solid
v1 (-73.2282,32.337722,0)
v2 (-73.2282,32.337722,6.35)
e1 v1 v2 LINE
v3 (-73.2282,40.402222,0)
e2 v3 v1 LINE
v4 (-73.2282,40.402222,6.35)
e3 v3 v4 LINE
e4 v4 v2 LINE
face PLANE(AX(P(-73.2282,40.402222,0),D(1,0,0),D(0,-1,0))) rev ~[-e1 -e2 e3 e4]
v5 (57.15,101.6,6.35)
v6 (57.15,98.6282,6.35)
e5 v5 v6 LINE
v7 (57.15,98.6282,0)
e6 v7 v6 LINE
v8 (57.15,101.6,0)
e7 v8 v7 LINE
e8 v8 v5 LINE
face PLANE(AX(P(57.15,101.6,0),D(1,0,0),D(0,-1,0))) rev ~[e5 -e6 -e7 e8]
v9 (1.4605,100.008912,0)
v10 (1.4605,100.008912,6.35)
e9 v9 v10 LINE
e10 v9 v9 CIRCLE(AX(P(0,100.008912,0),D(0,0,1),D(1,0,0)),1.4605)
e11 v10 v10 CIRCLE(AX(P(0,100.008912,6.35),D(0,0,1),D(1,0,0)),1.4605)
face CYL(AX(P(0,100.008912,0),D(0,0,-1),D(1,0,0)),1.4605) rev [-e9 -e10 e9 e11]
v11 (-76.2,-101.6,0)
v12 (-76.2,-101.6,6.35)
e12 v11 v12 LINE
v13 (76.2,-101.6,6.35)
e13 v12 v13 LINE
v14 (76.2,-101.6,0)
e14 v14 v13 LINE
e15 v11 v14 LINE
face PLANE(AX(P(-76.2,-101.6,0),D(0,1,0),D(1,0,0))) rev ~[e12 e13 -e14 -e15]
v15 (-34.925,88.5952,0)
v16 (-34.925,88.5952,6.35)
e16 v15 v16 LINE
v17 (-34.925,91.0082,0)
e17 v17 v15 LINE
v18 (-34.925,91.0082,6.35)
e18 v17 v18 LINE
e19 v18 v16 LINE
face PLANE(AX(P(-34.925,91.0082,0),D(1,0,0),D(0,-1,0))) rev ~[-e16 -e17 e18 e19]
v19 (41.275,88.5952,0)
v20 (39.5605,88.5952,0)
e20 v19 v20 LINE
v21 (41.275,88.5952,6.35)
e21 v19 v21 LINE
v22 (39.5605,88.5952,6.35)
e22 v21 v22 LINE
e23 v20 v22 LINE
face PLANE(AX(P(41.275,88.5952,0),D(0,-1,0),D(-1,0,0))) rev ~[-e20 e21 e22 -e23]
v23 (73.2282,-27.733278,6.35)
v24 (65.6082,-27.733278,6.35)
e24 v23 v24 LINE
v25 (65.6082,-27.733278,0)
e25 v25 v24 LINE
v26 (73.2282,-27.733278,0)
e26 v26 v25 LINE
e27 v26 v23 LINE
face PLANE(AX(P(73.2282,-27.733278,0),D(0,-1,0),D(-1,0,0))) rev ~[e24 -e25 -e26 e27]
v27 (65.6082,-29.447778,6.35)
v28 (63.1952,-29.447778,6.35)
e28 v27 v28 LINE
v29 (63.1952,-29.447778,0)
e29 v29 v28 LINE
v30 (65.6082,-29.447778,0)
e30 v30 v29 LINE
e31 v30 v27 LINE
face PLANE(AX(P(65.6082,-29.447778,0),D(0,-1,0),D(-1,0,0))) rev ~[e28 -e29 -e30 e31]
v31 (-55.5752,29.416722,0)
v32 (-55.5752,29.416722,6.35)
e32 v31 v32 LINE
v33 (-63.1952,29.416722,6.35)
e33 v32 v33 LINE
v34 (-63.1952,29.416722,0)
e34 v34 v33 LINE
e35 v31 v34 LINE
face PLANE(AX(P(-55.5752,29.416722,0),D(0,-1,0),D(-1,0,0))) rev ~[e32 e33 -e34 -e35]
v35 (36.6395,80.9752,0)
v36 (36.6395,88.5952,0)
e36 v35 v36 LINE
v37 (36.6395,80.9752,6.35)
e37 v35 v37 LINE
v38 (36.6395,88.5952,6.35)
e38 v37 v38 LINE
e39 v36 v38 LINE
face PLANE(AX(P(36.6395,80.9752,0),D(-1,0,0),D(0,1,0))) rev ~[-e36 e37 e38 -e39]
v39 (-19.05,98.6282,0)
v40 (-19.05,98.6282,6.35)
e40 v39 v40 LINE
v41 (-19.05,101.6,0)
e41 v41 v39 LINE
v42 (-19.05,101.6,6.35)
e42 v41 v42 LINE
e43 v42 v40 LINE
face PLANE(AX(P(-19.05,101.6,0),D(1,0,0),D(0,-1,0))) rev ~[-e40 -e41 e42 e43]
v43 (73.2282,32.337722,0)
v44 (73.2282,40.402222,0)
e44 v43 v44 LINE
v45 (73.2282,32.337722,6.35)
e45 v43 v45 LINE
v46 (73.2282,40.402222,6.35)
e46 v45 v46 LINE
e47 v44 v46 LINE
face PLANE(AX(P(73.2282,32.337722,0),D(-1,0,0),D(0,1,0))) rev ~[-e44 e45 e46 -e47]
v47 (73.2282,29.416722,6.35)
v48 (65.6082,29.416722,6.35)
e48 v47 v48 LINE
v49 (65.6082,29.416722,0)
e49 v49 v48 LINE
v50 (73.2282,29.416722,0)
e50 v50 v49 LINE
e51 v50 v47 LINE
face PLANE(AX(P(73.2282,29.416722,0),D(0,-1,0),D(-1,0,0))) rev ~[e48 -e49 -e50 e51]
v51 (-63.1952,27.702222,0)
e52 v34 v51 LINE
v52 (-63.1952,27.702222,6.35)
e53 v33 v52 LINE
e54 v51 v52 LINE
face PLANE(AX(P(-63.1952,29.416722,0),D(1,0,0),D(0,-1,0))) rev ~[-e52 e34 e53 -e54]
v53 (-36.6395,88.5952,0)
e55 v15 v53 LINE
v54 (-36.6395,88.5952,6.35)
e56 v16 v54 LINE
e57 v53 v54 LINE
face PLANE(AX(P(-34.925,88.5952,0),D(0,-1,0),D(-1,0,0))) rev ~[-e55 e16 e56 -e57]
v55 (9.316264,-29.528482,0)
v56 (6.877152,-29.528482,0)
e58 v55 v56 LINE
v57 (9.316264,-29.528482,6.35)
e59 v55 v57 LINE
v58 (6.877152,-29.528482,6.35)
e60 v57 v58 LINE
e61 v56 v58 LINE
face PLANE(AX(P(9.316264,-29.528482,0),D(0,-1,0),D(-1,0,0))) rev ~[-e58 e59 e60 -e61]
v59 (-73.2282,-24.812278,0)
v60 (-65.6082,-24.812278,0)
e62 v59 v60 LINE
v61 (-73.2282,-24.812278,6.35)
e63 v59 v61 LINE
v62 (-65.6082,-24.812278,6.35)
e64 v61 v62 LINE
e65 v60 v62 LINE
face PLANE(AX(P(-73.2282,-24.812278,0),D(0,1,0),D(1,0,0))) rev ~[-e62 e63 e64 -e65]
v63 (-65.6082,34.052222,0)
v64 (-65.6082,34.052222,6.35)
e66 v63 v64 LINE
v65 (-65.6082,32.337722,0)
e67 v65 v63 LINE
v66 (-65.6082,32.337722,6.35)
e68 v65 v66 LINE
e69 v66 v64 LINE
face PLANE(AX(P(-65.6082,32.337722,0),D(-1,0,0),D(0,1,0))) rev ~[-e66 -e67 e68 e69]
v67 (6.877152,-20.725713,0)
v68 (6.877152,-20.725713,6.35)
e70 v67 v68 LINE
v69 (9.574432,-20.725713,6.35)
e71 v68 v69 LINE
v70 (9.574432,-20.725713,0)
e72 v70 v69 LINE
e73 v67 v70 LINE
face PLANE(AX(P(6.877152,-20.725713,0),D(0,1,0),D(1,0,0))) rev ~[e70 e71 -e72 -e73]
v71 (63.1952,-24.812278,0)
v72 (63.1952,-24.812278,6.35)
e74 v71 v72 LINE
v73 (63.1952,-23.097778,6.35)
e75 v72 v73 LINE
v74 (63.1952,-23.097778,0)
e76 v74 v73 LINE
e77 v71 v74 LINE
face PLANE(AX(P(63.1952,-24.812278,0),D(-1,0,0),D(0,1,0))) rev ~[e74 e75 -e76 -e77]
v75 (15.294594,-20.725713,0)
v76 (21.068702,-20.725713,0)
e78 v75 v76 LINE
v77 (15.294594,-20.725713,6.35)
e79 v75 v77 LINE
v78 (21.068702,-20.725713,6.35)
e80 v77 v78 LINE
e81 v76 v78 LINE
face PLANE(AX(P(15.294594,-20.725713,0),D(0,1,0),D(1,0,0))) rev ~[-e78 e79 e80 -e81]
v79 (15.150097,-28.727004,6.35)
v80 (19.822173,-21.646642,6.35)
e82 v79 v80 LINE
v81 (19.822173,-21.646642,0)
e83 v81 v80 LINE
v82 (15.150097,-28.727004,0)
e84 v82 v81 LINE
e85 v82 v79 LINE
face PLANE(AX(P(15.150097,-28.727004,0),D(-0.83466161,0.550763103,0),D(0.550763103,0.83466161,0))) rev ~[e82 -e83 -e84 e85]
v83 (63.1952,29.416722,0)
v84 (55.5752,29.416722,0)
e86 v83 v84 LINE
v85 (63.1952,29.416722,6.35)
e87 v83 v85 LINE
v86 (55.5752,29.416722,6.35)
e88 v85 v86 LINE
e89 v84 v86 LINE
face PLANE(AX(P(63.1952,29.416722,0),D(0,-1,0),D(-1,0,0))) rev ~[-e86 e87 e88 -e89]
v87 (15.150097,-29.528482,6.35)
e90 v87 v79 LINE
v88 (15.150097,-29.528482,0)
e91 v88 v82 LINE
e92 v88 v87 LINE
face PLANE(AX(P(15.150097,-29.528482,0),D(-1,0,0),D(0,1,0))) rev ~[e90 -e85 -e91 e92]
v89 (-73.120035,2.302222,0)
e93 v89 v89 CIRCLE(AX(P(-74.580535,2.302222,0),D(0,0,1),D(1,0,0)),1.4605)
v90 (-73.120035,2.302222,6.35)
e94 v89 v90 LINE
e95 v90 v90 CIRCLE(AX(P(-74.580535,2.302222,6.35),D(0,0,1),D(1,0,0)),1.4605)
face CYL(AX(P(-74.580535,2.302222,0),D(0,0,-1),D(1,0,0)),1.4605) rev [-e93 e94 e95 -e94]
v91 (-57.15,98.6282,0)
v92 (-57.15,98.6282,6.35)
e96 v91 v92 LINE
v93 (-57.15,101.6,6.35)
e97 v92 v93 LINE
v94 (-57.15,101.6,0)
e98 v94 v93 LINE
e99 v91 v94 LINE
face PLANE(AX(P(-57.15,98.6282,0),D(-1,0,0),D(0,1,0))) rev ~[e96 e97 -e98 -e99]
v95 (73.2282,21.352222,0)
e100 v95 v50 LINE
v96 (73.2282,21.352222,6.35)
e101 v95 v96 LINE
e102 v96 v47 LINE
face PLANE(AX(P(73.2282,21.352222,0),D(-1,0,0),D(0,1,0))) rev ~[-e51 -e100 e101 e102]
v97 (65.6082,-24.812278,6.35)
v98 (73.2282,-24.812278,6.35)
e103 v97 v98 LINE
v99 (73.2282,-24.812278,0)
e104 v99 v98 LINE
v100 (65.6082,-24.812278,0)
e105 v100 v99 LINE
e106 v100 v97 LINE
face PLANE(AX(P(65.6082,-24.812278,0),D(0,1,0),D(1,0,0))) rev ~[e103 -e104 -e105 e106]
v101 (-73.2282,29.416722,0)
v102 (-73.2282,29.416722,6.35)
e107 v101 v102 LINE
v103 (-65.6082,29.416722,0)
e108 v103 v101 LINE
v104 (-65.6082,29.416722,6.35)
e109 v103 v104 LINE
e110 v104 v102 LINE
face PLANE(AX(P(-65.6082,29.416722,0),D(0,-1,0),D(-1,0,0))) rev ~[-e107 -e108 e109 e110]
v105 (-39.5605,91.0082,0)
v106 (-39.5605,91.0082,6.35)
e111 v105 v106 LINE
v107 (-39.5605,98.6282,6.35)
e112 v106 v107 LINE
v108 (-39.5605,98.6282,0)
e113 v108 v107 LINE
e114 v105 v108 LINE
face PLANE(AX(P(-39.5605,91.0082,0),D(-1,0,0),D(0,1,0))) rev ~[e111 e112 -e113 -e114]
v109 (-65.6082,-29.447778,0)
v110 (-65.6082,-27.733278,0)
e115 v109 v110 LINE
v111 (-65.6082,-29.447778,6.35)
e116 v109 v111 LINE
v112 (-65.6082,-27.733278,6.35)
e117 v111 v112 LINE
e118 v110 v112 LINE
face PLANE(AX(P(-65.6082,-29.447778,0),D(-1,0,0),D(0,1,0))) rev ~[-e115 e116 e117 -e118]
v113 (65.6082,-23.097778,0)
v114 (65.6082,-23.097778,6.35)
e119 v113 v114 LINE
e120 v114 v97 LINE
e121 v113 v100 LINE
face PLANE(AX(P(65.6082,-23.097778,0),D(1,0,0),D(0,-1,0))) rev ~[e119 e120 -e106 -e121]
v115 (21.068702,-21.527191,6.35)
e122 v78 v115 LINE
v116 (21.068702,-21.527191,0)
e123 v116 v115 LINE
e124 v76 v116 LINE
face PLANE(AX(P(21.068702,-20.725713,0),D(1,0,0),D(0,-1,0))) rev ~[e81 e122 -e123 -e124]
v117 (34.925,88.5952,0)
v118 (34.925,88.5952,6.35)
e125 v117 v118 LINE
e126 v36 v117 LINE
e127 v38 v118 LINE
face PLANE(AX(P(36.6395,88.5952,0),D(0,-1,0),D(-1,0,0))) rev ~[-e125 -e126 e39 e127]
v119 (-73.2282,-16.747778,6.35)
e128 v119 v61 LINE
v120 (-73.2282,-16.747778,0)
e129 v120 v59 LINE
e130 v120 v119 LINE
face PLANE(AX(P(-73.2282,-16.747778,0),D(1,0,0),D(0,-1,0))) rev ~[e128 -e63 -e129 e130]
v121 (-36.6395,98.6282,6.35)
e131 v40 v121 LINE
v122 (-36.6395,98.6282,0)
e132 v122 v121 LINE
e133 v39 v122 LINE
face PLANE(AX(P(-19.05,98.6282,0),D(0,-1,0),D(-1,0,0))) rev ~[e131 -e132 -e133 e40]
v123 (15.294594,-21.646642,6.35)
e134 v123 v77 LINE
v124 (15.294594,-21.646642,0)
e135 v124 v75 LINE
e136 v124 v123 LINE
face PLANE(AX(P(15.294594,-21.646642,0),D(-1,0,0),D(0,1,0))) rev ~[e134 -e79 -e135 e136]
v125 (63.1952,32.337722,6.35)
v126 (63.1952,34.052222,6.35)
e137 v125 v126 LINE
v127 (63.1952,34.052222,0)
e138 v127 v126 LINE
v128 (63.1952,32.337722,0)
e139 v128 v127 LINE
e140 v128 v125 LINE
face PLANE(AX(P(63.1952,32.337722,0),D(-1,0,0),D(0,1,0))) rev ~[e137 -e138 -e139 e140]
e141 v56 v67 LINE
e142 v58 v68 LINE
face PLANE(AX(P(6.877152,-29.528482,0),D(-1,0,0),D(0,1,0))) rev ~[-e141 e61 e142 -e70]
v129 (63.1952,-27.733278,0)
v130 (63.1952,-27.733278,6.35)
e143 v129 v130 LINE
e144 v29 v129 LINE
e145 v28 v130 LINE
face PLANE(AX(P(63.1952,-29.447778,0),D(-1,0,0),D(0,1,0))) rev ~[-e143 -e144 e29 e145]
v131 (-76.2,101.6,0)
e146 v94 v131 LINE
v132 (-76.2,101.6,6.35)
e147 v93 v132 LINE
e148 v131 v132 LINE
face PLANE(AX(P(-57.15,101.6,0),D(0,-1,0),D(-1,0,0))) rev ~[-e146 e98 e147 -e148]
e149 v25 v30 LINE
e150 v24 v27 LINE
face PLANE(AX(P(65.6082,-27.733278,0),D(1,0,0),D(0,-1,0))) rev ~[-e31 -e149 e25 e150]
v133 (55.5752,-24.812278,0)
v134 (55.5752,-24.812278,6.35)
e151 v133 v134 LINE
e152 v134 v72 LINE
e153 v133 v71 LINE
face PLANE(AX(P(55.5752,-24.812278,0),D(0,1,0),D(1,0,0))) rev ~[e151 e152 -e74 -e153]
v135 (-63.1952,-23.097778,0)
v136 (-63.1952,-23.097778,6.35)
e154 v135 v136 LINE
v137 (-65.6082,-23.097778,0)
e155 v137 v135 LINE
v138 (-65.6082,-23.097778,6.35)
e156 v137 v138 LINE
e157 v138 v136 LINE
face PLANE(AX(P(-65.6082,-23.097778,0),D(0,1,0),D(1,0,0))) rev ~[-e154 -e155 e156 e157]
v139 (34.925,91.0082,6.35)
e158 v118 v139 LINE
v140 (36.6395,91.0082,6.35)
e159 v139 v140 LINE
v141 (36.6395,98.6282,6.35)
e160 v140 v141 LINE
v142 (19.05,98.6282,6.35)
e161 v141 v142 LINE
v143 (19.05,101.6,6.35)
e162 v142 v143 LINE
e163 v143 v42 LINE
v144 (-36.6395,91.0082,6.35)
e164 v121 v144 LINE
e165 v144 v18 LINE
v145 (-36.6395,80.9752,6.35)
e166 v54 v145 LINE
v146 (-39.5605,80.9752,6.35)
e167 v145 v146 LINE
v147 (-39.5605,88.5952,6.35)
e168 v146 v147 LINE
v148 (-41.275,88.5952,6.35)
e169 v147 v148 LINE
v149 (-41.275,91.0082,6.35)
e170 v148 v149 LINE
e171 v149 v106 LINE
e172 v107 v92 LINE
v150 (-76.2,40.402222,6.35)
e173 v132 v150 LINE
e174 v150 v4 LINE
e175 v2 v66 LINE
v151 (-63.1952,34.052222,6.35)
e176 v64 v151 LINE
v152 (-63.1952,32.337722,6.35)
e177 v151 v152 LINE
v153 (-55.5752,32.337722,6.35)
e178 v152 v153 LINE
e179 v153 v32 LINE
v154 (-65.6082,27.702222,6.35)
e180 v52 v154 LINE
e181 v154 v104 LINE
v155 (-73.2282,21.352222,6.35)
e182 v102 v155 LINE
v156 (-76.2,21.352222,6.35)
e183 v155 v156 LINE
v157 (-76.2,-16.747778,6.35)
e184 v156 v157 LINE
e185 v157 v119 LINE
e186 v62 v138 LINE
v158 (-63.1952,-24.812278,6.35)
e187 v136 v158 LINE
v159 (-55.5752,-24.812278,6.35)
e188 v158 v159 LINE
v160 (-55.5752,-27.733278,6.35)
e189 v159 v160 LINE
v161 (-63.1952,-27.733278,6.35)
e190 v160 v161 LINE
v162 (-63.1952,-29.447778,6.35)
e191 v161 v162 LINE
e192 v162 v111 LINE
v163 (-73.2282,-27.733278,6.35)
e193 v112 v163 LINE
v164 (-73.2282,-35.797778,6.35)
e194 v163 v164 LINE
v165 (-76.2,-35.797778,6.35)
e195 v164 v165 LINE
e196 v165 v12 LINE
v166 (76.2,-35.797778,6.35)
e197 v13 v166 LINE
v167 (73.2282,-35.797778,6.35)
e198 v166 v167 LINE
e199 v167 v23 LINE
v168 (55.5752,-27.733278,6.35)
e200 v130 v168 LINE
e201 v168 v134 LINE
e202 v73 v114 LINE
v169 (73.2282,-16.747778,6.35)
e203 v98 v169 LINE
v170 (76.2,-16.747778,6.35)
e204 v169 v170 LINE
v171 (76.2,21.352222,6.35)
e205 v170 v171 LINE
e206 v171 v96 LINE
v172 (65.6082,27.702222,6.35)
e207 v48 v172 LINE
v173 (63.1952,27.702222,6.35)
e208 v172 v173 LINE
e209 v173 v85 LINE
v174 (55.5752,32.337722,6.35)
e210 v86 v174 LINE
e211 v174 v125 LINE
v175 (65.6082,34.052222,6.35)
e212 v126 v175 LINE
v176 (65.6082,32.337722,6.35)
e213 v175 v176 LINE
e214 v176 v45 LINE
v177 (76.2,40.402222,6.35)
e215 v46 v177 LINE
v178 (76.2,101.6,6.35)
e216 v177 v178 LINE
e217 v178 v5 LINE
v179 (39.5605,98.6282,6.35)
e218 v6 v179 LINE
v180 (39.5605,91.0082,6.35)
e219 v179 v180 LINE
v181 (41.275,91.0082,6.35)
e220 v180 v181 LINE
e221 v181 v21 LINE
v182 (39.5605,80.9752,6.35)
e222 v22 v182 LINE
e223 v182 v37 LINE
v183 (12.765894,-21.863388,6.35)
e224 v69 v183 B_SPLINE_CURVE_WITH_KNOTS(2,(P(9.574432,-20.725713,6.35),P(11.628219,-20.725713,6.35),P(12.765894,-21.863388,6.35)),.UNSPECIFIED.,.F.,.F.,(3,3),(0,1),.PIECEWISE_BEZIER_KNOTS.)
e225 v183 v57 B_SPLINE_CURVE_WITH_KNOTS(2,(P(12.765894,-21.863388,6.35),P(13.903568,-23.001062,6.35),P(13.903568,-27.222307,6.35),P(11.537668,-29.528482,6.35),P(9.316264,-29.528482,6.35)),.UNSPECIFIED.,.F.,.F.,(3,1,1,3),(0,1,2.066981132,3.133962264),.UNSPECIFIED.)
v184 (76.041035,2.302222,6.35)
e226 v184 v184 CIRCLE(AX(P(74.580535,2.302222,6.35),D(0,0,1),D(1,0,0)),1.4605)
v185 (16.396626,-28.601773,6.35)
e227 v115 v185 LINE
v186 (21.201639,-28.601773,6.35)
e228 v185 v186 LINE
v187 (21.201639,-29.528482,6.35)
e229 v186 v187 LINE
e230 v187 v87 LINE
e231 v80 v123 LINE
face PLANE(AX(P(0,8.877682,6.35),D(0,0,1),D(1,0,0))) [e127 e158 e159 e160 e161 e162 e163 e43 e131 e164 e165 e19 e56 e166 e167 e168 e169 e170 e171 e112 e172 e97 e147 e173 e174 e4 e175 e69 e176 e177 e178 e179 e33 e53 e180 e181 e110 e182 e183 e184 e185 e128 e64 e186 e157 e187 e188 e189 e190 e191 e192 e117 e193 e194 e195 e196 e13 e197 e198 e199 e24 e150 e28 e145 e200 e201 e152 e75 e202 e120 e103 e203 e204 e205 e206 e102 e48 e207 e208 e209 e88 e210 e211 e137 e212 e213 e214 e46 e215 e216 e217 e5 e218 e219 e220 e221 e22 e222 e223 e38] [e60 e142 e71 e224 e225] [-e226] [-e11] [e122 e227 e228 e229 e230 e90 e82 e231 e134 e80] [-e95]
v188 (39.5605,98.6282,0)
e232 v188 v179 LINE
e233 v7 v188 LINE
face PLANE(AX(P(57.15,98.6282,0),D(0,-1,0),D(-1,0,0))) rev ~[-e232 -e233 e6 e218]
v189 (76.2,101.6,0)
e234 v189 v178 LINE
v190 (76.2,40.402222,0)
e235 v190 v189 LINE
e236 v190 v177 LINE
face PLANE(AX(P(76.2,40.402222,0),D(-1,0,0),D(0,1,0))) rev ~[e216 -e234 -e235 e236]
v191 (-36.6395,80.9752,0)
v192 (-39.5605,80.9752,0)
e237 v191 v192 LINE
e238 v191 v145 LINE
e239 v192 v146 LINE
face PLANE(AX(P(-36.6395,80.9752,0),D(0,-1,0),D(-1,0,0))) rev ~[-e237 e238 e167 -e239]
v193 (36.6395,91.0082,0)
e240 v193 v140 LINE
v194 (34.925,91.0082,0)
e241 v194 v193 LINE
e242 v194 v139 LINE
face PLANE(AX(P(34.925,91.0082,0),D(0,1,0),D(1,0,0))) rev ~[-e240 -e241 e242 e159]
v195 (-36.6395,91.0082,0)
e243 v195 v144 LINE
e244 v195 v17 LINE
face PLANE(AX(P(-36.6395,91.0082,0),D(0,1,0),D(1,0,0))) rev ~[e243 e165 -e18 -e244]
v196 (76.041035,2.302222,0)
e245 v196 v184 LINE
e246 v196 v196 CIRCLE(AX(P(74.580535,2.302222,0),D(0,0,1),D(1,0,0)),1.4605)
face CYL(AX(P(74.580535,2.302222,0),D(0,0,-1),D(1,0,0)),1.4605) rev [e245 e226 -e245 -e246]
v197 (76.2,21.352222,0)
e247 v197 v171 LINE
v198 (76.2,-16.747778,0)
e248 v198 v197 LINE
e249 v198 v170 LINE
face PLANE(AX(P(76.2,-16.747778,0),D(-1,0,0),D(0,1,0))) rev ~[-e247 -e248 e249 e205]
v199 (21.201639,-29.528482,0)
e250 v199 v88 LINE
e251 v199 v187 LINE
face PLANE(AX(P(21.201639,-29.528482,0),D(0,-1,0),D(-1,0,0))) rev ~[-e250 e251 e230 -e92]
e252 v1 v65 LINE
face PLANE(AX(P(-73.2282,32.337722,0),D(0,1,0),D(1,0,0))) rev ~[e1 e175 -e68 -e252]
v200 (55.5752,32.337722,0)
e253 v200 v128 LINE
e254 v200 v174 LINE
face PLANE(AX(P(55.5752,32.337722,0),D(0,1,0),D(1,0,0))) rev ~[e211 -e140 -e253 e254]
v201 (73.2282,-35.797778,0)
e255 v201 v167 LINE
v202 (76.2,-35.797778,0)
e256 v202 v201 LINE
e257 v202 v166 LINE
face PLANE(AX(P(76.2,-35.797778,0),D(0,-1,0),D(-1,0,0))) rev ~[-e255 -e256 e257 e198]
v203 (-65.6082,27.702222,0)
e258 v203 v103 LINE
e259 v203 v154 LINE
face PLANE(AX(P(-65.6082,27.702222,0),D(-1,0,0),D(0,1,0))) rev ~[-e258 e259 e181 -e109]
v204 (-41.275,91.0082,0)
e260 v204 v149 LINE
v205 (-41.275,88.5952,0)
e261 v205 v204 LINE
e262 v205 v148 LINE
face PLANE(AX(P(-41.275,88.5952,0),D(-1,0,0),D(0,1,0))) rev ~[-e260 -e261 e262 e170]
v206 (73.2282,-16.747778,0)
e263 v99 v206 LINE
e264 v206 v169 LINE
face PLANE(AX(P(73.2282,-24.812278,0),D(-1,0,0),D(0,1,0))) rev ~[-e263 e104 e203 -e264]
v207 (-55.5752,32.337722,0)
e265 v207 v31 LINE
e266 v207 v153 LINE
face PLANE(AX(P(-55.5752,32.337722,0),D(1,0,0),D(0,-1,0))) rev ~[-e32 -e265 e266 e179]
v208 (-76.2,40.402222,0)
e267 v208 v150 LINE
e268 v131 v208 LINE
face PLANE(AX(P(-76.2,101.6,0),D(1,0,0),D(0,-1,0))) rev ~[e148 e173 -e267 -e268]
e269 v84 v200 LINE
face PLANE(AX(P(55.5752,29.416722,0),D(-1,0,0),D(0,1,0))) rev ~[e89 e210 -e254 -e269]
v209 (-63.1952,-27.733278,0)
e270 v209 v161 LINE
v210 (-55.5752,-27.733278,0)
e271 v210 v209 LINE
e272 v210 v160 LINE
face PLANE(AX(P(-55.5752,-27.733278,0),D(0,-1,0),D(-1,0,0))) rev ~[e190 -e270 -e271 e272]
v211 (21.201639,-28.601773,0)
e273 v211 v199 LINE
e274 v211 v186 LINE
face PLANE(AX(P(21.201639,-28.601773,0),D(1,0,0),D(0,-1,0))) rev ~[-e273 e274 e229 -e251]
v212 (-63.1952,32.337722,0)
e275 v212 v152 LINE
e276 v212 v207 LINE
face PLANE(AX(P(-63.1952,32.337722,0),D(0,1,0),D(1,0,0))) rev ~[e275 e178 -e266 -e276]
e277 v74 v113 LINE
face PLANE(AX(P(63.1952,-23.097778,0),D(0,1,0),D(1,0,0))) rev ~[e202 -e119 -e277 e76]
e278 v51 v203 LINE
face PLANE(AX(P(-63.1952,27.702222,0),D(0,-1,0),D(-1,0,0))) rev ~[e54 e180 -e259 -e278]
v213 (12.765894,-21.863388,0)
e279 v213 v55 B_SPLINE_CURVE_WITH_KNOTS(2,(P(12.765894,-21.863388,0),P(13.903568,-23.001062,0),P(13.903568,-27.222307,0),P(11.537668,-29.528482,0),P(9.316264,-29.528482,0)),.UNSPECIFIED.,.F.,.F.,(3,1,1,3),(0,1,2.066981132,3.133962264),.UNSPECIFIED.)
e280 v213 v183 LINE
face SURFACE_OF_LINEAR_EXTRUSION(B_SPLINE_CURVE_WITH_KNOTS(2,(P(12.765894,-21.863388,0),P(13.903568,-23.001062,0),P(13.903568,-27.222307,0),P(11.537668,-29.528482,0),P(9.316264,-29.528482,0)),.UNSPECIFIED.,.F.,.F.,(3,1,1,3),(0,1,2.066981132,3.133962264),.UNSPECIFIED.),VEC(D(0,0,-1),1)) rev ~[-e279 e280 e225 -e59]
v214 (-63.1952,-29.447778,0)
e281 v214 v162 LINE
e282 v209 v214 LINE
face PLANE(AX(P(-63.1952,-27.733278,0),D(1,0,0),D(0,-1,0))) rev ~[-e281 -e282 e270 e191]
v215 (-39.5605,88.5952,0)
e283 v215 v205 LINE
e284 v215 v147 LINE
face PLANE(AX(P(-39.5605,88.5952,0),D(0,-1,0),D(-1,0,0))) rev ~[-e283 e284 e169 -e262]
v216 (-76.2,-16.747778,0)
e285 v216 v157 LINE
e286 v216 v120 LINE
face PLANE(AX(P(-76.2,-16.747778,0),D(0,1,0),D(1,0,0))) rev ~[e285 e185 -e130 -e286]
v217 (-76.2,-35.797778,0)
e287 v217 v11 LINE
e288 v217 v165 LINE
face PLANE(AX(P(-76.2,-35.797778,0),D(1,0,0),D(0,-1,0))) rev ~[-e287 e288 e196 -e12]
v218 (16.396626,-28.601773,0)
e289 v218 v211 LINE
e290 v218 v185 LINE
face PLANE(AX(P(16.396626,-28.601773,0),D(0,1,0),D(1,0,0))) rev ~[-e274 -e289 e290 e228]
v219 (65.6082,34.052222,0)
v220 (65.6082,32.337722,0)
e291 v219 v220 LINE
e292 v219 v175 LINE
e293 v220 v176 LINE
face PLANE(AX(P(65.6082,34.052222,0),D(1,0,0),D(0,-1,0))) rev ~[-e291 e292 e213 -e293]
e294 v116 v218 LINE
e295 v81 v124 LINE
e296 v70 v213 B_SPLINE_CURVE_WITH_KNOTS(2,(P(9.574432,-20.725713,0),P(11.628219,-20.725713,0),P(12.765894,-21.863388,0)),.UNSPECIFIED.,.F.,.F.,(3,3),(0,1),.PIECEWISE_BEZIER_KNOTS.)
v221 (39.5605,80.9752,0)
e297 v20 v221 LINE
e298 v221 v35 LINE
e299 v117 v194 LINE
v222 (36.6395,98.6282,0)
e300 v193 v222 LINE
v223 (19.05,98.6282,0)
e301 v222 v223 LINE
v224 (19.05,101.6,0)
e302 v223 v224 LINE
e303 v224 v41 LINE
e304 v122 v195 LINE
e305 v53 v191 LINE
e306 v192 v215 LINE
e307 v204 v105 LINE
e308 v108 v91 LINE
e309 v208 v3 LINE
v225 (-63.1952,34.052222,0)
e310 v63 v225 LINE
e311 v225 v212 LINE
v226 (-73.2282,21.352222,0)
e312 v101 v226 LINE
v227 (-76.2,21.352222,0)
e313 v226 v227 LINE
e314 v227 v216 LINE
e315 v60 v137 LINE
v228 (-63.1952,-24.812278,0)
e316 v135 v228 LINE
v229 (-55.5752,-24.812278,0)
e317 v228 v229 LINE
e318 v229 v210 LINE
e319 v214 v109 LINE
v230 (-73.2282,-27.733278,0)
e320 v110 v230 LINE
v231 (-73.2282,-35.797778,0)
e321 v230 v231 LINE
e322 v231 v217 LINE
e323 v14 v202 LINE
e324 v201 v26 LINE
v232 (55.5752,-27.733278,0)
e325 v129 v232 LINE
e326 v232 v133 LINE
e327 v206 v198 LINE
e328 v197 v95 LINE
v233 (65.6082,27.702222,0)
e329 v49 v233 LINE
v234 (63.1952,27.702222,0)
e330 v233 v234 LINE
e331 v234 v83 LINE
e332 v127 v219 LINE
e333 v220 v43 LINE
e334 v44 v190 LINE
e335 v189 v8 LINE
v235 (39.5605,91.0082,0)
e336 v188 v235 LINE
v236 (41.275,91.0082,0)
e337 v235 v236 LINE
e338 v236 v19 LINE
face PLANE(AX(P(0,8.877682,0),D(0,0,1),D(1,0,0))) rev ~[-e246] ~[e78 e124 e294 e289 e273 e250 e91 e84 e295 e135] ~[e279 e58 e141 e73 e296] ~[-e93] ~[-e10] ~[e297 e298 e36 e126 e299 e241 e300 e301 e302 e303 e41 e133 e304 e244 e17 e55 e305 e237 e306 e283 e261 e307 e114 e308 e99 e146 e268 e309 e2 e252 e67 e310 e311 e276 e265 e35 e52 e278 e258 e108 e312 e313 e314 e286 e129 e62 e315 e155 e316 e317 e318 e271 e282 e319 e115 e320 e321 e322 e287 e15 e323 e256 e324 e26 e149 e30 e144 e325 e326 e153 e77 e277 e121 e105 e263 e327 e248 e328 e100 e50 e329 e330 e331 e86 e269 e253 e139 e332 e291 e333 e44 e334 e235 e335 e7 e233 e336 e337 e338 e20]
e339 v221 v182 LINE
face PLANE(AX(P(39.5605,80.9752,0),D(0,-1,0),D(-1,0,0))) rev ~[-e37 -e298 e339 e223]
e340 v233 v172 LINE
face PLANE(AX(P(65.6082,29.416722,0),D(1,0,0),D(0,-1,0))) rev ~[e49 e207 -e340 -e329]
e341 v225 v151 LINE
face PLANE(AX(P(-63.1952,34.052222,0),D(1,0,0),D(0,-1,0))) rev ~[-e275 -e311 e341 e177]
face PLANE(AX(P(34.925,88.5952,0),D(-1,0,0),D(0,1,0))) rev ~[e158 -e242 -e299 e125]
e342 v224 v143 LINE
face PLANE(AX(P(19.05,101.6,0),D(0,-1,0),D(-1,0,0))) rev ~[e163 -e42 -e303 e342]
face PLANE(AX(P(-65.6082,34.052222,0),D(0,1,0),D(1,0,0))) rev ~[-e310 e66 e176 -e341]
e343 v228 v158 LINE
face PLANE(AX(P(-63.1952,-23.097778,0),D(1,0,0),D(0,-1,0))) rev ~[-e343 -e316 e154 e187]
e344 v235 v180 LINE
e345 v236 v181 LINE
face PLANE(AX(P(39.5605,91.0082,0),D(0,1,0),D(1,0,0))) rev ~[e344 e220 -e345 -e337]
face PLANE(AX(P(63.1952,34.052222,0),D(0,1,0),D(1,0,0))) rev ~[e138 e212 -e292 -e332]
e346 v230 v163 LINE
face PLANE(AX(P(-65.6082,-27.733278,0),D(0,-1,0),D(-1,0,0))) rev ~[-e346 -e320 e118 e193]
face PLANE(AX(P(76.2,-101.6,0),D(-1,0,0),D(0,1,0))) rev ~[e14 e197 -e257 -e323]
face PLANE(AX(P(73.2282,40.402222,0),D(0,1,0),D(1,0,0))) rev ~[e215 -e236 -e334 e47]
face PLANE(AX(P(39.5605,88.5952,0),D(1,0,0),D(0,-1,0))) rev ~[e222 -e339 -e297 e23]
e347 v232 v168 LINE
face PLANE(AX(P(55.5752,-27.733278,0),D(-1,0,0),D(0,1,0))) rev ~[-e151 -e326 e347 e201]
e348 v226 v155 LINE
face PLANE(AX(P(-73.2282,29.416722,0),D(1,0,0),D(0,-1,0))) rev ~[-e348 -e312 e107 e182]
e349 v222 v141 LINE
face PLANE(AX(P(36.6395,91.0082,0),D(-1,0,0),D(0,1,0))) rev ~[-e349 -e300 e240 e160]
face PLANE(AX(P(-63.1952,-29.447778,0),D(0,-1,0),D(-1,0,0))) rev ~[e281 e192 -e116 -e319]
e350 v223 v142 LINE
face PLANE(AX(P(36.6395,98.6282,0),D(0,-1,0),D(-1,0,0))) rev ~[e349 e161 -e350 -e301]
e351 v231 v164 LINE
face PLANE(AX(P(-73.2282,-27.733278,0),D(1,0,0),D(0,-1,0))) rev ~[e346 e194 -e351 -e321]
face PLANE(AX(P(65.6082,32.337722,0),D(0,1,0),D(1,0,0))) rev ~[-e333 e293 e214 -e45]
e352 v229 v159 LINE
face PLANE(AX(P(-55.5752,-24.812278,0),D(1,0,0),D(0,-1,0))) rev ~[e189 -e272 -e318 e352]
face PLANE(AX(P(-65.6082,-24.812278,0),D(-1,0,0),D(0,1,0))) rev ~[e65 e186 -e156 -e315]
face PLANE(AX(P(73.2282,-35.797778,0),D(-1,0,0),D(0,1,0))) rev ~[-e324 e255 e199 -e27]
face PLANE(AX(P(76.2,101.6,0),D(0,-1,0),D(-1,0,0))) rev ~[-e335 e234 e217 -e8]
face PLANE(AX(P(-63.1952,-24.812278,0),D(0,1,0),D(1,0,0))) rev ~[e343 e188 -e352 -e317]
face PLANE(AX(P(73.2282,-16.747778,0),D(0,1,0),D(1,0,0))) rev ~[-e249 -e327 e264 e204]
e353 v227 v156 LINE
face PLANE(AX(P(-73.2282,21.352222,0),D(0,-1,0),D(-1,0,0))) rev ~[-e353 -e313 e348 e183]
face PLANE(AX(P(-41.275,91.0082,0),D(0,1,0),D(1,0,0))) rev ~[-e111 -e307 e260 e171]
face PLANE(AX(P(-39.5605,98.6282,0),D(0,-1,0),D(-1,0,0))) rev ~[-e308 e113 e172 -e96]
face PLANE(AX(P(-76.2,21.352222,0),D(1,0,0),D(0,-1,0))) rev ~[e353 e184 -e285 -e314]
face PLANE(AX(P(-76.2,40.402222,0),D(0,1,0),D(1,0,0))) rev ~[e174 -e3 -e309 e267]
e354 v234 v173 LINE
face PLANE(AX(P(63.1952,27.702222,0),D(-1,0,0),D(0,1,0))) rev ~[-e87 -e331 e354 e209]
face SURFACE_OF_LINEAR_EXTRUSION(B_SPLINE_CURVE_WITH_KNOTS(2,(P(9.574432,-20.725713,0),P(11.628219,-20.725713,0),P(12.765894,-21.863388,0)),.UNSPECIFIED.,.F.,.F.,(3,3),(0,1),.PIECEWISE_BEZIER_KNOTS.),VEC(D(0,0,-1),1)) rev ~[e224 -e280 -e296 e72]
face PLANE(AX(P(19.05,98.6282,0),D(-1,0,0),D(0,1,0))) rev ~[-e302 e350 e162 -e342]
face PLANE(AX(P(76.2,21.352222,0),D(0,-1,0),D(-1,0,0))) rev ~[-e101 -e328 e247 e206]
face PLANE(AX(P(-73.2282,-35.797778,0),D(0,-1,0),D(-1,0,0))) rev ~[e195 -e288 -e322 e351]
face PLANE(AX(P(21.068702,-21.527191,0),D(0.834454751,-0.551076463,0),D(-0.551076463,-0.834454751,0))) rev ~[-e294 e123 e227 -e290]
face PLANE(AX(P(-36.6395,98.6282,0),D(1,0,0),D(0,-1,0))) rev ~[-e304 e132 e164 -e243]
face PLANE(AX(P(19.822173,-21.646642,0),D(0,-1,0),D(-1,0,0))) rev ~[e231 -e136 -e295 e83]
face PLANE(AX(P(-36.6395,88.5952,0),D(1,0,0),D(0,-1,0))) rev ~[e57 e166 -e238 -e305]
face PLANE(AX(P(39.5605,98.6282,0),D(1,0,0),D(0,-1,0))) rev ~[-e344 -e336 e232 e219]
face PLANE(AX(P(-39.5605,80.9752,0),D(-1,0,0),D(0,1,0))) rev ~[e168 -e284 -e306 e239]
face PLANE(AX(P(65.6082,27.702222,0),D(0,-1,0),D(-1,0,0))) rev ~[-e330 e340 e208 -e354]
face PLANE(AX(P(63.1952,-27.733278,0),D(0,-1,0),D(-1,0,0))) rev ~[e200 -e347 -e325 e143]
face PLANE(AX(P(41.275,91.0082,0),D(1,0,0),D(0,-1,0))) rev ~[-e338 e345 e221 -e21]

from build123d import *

# Parameters (mm, degrees)
F0_R     = 1.4605
F1_DEPTH = 6.35


# Not quite as in the source:
# - a feature names something its author has since deleted; it is built from what else it names


with BuildPart() as f1:
    # F0 (on Top) → F1 (new body)
    with BuildSketch(Plane.XY):
        Polygon((-57.1500000004, 101.5999999999), (-76.2, 101.5999999999), (-76.2, 40.4022223395), (-73.2282, 40.4022223395), (-73.2282, 32.3377223395), (-65.6082, 32.3377223395), (-65.6082, 34.0522223395), (-63.1952, 34.0522223395), (-63.1952, 32.3377223395), (-55.5752, 32.3377223395), (-55.5752, 30.8772223395), (-55.5752, 29.4167223395), (-63.1952, 29.4167223395), (-63.1952, 27.7022223395), (-65.6082, 27.7022223395), (-65.6082, 29.4167223395), (-73.2282, 29.4167223395), (-73.2282, 21.3522223395), (-76.2, 21.3522223395), (-76.2, -16.7477776605), (-73.2282, -16.7477776605), (-73.2282, -24.8122776605), (-65.6082, -24.8122776605), (-65.6082, -23.0977776605), (-63.1952, -23.0977776605), (-63.1952, -24.8122776605), (-55.5752, -24.8122776605), (-55.5752, -26.2727776605), (-55.5752, -27.7332776605), (-63.1952, -27.7332776605), (-63.1952, -29.4477776605), (-65.6082, -29.4477776605), (-65.6082, -27.7332776605), (-73.2282, -27.7332776605), (-73.2282, -35.7977776604), (-76.2, -35.7977776604), (-76.2, -101.5999999999), (76.2, -101.5999999999), (76.2, -35.7977776604), (73.2282, -35.7977776604), (73.2282, -27.7332776605), (65.6082, -27.7332776605), (65.6082, -29.4477776605), (63.1952, -29.4477776605), (63.1952, -27.7332776605), (55.5752, -27.7332776605), (55.5752, -26.2727776605), (55.5752, -24.8122776605), (63.1952, -24.8122776605), (63.1952, -23.0977776605), (65.6082, -23.0977776605), (65.6082, -24.8122776605), (73.2282, -24.8122776605), (73.2282, -16.7477776605), (76.2, -16.7477776605), (76.2, 21.3522223395), (73.2282, 21.3522223395), (73.2282, 29.4167223395), (65.6082, 29.4167223395), (65.6082, 27.7022223395), (63.1952, 27.7022223395), (63.1952, 29.4167223395), (55.5752, 29.4167223395), (55.5752, 30.8772223395), (55.5752, 32.3377223395), (63.1952, 32.3377223395), (63.1952, 34.0522223395), (65.6082, 34.0522223395), (65.6082, 32.3377223395), (73.2282, 32.3377223395), (73.2282, 40.4022223395), (76.2, 40.4022223395), (76.2, 101.5999999999), (57.1499999998, 101.5999999999), (57.1499999998, 98.6281999999), (39.5605000002, 98.6281999999), (39.5605000002, 91.0081999999), (41.2750000002, 91.0081999999), (41.2750000002, 88.5951999999), (39.5605000002, 88.5951999999), (39.5605000002, 80.9751999999), (38.1000000002, 80.9751999999), (36.6395000002, 80.9751999999), (36.6395000002, 88.5951999999), (34.9250000002, 88.5951999999), (34.9250000002, 91.0081999999), (36.6395000002, 91.0081999999), (36.6395000002, 98.6281999999), (19.05, 98.6281999999), (19.05, 101.5999999999), (-19.05, 101.5999999999), (-19.05, 98.6281999999), (-21.3974503974, 98.6281999999), (-36.6395000002, 98.6281999999), (-36.6395000002, 91.0081999999), (-34.9250000002, 91.0081999999), (-34.9250000002, 88.5951999999), (-36.6395000002, 88.5951999999), (-36.6395000002, 80.9751999999), (-38.1000000002, 80.9751999999), (-39.5605000002, 80.9751999999), (-39.5605000002, 88.5951999999), (-41.2750000002, 88.5951999999), (-41.2750000002, 91.0081999999), (-39.5605000002, 91.0081999999), (-39.5605000002, 98.6281999999), (-57.1500000004, 98.6281999999), align=None)
        with BuildLine():
            add(Edge.make_bspline(
                [(12.7658935974, -21.8633876268), (13.9035680881, -23.0010621174), (13.9035680881, -25.0432889762)],
                knots=[0, 0, 0, 1, 1, 1], degree=2))
            add(Edge.make_bspline(
                [(13.9035680881, -25.0432889762), (13.9035680881, -27.2223065019), (12.7206178133, -28.3753940255)],
                knots=[0, 0, 0, 1, 1, 1], degree=2))
            add(Edge.make_bspline(
                [(12.7206178133, -28.3753940255), (11.5376675385, -29.5284815491), (9.3162641723, -29.5284815491)],
                knots=[0, 0, 0, 1, 1, 1], degree=2))
            Line((9.3162641723, -29.5284815491), (6.8771517165, -29.5284815491))
            Line((6.8771517165, -29.5284815491), (6.8771517165, -20.7257131361))
            Line((6.8771517165, -20.7257131361), (9.5744324733, -20.7257131361))
            add(Edge.make_bspline(
                [(9.5744324733, -20.7257131361), (11.6282191068, -20.7257131361), (12.7658935974, -21.8633876268)],
                knots=[0, 0, 0, 1, 1, 1], degree=2))
        make_face(mode=Mode.SUBTRACT)
        Polygon((21.2016391646, -28.6017729462), (21.2016391646, -29.5284815491), (15.1500971236, -29.5284815491), (15.1500971236, -28.7270038385), (19.8221727203, -21.6466418517), (15.294594307, -21.6466418517), (15.294594307, -20.7257131361), (21.0687017558, -20.7257131361), (21.0687017558, -21.5271908467), (16.3966261591, -28.6017729462), align=None, mode=Mode.SUBTRACT)
        with Locations((-74.5805352926, 2.3022223395)):
            Circle(F0_R, mode=Mode.SUBTRACT)
        with Locations((74.5805352926, 2.3022223395)):
            Circle(F0_R, mode=Mode.SUBTRACT)
        with Locations((0, 100.0089123845)):
            Circle(F0_R, mode=Mode.SUBTRACT)
    extrude(amount=F1_DEPTH)


solid = f1.part
